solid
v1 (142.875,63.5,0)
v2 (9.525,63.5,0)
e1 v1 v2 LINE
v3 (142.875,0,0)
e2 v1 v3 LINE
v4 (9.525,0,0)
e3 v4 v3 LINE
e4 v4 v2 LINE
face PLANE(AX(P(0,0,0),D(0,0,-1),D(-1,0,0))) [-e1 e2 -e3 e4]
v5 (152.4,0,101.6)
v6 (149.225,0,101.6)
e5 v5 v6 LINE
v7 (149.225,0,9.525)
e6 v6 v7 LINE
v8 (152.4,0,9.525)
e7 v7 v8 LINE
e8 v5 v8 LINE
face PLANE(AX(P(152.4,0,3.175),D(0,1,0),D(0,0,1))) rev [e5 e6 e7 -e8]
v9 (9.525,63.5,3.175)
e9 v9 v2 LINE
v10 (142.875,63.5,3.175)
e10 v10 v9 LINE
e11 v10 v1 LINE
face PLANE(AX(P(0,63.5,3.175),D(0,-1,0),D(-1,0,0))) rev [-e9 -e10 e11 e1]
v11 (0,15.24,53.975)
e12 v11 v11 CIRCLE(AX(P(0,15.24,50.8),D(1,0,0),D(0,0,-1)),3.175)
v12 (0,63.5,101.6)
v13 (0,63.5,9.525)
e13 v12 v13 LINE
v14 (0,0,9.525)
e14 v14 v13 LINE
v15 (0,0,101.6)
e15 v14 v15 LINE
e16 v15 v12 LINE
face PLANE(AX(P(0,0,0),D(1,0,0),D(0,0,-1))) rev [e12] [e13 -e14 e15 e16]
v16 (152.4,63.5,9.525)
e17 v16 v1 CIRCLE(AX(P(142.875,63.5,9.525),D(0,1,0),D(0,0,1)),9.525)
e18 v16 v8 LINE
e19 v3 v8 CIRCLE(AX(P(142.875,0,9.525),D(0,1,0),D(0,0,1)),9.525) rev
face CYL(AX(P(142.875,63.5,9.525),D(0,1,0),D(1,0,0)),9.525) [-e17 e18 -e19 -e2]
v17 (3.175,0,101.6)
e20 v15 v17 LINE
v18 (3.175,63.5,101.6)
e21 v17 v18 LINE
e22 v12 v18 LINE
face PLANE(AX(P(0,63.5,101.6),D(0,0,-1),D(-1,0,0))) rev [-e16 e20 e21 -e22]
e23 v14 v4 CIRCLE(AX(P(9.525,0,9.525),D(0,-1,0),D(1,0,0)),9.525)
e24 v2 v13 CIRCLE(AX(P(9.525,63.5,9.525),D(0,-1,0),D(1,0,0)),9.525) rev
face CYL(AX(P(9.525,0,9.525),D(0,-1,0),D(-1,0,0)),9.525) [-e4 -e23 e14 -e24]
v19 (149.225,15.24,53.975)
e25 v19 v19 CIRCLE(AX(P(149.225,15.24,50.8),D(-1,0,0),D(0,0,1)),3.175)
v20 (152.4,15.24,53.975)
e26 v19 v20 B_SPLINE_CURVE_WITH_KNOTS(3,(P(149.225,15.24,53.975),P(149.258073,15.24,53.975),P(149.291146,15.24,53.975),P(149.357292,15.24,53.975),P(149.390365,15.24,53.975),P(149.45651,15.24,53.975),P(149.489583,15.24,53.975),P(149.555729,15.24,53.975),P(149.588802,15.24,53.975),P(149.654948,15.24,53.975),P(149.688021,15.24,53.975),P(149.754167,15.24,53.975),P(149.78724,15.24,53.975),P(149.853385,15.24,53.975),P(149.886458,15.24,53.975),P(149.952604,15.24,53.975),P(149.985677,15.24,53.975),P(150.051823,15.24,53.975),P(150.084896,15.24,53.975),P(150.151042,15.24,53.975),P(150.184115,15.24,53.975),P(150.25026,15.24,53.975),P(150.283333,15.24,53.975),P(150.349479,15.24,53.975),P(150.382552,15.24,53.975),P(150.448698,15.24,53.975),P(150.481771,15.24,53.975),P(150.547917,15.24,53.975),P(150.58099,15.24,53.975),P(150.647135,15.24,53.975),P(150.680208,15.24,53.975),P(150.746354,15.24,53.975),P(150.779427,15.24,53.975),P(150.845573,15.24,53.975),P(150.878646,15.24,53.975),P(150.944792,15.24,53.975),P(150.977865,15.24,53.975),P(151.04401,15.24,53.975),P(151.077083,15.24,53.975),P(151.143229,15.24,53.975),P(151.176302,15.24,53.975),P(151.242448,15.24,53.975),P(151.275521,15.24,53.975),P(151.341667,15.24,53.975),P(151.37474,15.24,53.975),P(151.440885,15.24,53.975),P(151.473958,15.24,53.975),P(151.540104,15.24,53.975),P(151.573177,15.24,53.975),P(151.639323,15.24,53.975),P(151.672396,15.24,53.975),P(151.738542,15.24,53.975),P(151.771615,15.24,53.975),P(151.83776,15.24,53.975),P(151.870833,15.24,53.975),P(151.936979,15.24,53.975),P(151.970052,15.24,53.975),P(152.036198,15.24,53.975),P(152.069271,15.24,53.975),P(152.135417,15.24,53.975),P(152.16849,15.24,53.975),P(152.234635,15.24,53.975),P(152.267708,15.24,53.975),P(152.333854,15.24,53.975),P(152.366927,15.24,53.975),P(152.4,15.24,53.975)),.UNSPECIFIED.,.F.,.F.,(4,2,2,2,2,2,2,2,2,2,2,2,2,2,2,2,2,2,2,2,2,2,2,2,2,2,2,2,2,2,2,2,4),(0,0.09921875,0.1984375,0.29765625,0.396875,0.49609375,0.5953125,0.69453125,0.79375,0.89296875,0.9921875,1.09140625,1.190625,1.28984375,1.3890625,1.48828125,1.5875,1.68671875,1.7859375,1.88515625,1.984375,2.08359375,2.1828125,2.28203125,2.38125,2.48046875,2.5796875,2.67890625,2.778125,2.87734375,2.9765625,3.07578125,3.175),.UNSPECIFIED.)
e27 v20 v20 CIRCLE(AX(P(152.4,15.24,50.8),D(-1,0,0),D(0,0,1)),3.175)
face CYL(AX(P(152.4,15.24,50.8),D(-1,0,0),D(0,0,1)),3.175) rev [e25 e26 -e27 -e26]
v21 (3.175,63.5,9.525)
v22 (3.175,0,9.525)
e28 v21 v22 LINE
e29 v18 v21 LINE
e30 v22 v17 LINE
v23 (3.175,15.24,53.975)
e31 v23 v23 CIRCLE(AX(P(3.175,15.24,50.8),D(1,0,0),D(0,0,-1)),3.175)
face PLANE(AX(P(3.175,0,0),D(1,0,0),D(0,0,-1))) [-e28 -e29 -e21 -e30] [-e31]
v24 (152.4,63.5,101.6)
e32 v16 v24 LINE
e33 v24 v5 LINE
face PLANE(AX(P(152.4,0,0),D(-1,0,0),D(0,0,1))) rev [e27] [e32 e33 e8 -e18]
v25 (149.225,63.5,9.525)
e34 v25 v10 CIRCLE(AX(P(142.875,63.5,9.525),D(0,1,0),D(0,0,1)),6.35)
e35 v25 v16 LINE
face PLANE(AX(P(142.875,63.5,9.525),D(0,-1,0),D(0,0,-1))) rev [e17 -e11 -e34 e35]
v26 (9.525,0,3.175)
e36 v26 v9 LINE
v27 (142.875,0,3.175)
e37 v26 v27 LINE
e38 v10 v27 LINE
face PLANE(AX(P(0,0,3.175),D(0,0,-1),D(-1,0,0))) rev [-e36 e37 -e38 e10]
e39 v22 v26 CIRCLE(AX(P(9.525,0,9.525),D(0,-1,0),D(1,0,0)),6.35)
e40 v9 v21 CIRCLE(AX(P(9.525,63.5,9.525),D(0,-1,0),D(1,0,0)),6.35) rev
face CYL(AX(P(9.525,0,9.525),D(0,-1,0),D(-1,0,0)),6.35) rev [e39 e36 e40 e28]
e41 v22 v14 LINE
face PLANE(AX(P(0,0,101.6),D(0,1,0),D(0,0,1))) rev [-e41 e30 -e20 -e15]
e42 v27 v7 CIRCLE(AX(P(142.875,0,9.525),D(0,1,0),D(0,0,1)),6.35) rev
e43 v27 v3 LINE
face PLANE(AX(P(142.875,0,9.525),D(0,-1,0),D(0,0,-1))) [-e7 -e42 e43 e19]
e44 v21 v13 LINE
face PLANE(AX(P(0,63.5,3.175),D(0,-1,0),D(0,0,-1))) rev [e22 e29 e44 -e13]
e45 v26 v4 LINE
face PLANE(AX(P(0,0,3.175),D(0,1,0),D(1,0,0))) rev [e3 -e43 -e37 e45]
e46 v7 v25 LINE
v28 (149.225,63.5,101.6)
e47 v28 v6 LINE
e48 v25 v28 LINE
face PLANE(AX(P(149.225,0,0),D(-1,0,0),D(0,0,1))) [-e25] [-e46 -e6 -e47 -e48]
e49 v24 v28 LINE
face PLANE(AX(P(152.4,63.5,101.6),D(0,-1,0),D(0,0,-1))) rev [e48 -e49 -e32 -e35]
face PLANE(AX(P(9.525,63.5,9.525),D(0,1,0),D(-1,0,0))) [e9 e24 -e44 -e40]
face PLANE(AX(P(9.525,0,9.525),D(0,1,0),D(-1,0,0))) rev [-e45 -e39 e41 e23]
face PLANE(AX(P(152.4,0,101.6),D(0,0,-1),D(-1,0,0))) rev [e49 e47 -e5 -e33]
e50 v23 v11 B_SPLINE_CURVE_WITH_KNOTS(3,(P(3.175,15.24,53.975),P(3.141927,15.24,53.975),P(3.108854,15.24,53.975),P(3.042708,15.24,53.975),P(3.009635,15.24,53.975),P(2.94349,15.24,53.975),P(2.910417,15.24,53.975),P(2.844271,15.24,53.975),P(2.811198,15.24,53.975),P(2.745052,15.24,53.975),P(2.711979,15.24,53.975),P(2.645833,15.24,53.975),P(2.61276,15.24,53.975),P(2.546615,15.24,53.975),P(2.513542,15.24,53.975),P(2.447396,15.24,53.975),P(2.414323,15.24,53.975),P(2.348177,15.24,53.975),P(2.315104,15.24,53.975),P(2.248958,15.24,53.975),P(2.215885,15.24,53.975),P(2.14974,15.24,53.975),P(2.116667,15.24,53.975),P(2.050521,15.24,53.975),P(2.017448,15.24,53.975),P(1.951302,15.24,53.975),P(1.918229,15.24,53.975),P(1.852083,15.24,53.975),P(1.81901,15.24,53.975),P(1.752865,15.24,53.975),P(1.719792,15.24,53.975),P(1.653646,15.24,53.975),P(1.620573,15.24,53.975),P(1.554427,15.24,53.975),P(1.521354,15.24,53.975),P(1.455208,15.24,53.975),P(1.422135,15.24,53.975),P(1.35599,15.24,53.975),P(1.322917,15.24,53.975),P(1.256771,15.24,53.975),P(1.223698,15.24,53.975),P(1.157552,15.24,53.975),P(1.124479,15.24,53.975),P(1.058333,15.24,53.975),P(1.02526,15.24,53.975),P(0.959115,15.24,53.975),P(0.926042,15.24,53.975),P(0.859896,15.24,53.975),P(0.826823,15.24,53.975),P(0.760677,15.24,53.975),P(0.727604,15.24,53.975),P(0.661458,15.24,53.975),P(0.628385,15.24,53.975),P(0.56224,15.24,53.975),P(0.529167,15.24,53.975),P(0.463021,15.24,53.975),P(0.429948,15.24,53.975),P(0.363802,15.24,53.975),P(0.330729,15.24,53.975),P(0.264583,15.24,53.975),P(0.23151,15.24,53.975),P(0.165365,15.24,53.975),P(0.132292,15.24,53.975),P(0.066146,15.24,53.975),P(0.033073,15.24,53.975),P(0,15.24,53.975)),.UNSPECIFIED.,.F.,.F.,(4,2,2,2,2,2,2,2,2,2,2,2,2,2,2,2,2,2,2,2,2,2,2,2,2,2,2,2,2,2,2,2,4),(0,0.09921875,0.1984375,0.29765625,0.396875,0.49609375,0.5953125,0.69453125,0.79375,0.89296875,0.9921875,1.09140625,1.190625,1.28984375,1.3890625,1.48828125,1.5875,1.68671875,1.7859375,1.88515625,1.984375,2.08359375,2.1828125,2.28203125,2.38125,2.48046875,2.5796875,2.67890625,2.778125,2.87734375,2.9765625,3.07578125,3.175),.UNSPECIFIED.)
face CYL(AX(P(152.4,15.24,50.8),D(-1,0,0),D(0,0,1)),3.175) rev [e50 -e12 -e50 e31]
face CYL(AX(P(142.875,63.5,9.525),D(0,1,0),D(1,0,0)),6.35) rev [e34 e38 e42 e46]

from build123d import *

# Parameters (mm, degrees)
SKETCH1_W                      = 152.4
SKETCH1_H                      = 63.5
BOSS_EXTRUDE1_DEPTH            = 3.175
EDGE_FLANGE1_STRIP_W           = 25.4
EDGE_FLANGE1_STRIP_H           = 3.175
EDGE_FLANGE1_STRIP_CUT_DEPTH   = 63.5
EDGE_FLANGE1_STRIP_2_W         = 25.4
EDGE_FLANGE1_STRIP_2_H         = 3.175
EDGE_FLANGE1_STRIP_CUT_2_DEPTH = 63.5
EDGE_FLANGE1_DEPTH             = 63.5
EDGE_FLANGE1_BEND_DEPTH        = 63.5
CUT_EXTRUDE1_DEPTH             = 194.857086535
CUT_EXTRUDE1_DEPTH_BACK        = 194.857086535
SKETCH22_R                     = 3.175


# Sheet-metal steps are written as plain solids
with BuildPart() as part:
    # Sketch1 → Boss-Extrude1 (new body)
    with BuildSketch(Plane.XY):
        with Locations((76.2, 31.75)):
            Rectangle(SKETCH1_W, SKETCH1_H)
    extrude(amount=BOSS_EXTRUDE1_DEPTH)

    # Edge-Flange1 strip (across the edge) → Edge-Flange1 strip cut (cut)
    with BuildSketch(Plane(origin=(0, 63.5, 3.175), x_dir=(1, 0, 0), z_dir=(0, -1, 0))):
        with Locations((-3.175, -1.5875)):
            Rectangle(EDGE_FLANGE1_STRIP_W, EDGE_FLANGE1_STRIP_H)
    extrude(amount=EDGE_FLANGE1_STRIP_CUT_DEPTH, mode=Mode.SUBTRACT)

    # Edge-Flange1 strip 2 (across the edge) → Edge-Flange1 strip cut 2 (cut)
    with BuildSketch(Plane(origin=(152.4, 0, 3.175), x_dir=(-1, 0, 0), z_dir=(0, 1, 0))):
        with Locations((-3.175, -1.5875)):
            Rectangle(EDGE_FLANGE1_STRIP_2_W, EDGE_FLANGE1_STRIP_2_H)
    extrude(amount=EDGE_FLANGE1_STRIP_CUT_2_DEPTH, mode=Mode.SUBTRACT)

    # Edge-Flange1 section (across the edge) → Edge-Flange1 (add)
    with BuildSketch(Plane(origin=(0, 63.5, 3.175), x_dir=(1, 0, 0), z_dir=(0, -1, 0))):
        with BuildLine():
            Line((0, 6.35), (0, 98.425))
            Line((0, 98.425), (3.175, 98.425))
            Line((3.175, 98.425), (3.175, 6.35))
            ThreePointArc((3.175, 6.35), (5.034871939, 1.859871939), (9.525, 0))
            Line((9.525, 0), (9.525, -3.175))
            ThreePointArc((9.525, -3.175), (2.789807909, -0.385192091), (0, 6.35))
        make_face()
    extrude(amount=EDGE_FLANGE1_DEPTH)

    # Edge-Flange1 section 2 (across the edge) → Edge-Flange1 bend (add)
    with BuildSketch(Plane(origin=(152.4, 0, 3.175), x_dir=(-1, 0, 0), z_dir=(0, 1, 0))):
        with BuildLine():
            Line((0, 6.35), (0, 98.425))
            Line((0, 98.425), (3.175, 98.425))
            Line((3.175, 98.425), (3.175, 6.35))
            ThreePointArc((3.175, 6.35), (5.034871939, 1.859871939), (9.525, 0))
            Line((9.525, 0), (9.525, -3.175))
            ThreePointArc((9.525, -3.175), (2.789807909, -0.385192091), (0, 6.35))
        make_face()
    extrude(amount=EDGE_FLANGE1_BEND_DEPTH)

    # Sketch22 → Cut-Extrude1 (cut, two sides: drawn at the far end of the back side and taken through both)
    with BuildSketch(Plane.ZY.offset(-CUT_EXTRUDE1_DEPTH_BACK)):
        with Locations((50.8, 15.24)):
            Circle(SKETCH22_R)
    extrude(amount=CUT_EXTRUDE1_DEPTH + CUT_EXTRUDE1_DEPTH_BACK, mode=Mode.SUBTRACT)


solid = part.part
